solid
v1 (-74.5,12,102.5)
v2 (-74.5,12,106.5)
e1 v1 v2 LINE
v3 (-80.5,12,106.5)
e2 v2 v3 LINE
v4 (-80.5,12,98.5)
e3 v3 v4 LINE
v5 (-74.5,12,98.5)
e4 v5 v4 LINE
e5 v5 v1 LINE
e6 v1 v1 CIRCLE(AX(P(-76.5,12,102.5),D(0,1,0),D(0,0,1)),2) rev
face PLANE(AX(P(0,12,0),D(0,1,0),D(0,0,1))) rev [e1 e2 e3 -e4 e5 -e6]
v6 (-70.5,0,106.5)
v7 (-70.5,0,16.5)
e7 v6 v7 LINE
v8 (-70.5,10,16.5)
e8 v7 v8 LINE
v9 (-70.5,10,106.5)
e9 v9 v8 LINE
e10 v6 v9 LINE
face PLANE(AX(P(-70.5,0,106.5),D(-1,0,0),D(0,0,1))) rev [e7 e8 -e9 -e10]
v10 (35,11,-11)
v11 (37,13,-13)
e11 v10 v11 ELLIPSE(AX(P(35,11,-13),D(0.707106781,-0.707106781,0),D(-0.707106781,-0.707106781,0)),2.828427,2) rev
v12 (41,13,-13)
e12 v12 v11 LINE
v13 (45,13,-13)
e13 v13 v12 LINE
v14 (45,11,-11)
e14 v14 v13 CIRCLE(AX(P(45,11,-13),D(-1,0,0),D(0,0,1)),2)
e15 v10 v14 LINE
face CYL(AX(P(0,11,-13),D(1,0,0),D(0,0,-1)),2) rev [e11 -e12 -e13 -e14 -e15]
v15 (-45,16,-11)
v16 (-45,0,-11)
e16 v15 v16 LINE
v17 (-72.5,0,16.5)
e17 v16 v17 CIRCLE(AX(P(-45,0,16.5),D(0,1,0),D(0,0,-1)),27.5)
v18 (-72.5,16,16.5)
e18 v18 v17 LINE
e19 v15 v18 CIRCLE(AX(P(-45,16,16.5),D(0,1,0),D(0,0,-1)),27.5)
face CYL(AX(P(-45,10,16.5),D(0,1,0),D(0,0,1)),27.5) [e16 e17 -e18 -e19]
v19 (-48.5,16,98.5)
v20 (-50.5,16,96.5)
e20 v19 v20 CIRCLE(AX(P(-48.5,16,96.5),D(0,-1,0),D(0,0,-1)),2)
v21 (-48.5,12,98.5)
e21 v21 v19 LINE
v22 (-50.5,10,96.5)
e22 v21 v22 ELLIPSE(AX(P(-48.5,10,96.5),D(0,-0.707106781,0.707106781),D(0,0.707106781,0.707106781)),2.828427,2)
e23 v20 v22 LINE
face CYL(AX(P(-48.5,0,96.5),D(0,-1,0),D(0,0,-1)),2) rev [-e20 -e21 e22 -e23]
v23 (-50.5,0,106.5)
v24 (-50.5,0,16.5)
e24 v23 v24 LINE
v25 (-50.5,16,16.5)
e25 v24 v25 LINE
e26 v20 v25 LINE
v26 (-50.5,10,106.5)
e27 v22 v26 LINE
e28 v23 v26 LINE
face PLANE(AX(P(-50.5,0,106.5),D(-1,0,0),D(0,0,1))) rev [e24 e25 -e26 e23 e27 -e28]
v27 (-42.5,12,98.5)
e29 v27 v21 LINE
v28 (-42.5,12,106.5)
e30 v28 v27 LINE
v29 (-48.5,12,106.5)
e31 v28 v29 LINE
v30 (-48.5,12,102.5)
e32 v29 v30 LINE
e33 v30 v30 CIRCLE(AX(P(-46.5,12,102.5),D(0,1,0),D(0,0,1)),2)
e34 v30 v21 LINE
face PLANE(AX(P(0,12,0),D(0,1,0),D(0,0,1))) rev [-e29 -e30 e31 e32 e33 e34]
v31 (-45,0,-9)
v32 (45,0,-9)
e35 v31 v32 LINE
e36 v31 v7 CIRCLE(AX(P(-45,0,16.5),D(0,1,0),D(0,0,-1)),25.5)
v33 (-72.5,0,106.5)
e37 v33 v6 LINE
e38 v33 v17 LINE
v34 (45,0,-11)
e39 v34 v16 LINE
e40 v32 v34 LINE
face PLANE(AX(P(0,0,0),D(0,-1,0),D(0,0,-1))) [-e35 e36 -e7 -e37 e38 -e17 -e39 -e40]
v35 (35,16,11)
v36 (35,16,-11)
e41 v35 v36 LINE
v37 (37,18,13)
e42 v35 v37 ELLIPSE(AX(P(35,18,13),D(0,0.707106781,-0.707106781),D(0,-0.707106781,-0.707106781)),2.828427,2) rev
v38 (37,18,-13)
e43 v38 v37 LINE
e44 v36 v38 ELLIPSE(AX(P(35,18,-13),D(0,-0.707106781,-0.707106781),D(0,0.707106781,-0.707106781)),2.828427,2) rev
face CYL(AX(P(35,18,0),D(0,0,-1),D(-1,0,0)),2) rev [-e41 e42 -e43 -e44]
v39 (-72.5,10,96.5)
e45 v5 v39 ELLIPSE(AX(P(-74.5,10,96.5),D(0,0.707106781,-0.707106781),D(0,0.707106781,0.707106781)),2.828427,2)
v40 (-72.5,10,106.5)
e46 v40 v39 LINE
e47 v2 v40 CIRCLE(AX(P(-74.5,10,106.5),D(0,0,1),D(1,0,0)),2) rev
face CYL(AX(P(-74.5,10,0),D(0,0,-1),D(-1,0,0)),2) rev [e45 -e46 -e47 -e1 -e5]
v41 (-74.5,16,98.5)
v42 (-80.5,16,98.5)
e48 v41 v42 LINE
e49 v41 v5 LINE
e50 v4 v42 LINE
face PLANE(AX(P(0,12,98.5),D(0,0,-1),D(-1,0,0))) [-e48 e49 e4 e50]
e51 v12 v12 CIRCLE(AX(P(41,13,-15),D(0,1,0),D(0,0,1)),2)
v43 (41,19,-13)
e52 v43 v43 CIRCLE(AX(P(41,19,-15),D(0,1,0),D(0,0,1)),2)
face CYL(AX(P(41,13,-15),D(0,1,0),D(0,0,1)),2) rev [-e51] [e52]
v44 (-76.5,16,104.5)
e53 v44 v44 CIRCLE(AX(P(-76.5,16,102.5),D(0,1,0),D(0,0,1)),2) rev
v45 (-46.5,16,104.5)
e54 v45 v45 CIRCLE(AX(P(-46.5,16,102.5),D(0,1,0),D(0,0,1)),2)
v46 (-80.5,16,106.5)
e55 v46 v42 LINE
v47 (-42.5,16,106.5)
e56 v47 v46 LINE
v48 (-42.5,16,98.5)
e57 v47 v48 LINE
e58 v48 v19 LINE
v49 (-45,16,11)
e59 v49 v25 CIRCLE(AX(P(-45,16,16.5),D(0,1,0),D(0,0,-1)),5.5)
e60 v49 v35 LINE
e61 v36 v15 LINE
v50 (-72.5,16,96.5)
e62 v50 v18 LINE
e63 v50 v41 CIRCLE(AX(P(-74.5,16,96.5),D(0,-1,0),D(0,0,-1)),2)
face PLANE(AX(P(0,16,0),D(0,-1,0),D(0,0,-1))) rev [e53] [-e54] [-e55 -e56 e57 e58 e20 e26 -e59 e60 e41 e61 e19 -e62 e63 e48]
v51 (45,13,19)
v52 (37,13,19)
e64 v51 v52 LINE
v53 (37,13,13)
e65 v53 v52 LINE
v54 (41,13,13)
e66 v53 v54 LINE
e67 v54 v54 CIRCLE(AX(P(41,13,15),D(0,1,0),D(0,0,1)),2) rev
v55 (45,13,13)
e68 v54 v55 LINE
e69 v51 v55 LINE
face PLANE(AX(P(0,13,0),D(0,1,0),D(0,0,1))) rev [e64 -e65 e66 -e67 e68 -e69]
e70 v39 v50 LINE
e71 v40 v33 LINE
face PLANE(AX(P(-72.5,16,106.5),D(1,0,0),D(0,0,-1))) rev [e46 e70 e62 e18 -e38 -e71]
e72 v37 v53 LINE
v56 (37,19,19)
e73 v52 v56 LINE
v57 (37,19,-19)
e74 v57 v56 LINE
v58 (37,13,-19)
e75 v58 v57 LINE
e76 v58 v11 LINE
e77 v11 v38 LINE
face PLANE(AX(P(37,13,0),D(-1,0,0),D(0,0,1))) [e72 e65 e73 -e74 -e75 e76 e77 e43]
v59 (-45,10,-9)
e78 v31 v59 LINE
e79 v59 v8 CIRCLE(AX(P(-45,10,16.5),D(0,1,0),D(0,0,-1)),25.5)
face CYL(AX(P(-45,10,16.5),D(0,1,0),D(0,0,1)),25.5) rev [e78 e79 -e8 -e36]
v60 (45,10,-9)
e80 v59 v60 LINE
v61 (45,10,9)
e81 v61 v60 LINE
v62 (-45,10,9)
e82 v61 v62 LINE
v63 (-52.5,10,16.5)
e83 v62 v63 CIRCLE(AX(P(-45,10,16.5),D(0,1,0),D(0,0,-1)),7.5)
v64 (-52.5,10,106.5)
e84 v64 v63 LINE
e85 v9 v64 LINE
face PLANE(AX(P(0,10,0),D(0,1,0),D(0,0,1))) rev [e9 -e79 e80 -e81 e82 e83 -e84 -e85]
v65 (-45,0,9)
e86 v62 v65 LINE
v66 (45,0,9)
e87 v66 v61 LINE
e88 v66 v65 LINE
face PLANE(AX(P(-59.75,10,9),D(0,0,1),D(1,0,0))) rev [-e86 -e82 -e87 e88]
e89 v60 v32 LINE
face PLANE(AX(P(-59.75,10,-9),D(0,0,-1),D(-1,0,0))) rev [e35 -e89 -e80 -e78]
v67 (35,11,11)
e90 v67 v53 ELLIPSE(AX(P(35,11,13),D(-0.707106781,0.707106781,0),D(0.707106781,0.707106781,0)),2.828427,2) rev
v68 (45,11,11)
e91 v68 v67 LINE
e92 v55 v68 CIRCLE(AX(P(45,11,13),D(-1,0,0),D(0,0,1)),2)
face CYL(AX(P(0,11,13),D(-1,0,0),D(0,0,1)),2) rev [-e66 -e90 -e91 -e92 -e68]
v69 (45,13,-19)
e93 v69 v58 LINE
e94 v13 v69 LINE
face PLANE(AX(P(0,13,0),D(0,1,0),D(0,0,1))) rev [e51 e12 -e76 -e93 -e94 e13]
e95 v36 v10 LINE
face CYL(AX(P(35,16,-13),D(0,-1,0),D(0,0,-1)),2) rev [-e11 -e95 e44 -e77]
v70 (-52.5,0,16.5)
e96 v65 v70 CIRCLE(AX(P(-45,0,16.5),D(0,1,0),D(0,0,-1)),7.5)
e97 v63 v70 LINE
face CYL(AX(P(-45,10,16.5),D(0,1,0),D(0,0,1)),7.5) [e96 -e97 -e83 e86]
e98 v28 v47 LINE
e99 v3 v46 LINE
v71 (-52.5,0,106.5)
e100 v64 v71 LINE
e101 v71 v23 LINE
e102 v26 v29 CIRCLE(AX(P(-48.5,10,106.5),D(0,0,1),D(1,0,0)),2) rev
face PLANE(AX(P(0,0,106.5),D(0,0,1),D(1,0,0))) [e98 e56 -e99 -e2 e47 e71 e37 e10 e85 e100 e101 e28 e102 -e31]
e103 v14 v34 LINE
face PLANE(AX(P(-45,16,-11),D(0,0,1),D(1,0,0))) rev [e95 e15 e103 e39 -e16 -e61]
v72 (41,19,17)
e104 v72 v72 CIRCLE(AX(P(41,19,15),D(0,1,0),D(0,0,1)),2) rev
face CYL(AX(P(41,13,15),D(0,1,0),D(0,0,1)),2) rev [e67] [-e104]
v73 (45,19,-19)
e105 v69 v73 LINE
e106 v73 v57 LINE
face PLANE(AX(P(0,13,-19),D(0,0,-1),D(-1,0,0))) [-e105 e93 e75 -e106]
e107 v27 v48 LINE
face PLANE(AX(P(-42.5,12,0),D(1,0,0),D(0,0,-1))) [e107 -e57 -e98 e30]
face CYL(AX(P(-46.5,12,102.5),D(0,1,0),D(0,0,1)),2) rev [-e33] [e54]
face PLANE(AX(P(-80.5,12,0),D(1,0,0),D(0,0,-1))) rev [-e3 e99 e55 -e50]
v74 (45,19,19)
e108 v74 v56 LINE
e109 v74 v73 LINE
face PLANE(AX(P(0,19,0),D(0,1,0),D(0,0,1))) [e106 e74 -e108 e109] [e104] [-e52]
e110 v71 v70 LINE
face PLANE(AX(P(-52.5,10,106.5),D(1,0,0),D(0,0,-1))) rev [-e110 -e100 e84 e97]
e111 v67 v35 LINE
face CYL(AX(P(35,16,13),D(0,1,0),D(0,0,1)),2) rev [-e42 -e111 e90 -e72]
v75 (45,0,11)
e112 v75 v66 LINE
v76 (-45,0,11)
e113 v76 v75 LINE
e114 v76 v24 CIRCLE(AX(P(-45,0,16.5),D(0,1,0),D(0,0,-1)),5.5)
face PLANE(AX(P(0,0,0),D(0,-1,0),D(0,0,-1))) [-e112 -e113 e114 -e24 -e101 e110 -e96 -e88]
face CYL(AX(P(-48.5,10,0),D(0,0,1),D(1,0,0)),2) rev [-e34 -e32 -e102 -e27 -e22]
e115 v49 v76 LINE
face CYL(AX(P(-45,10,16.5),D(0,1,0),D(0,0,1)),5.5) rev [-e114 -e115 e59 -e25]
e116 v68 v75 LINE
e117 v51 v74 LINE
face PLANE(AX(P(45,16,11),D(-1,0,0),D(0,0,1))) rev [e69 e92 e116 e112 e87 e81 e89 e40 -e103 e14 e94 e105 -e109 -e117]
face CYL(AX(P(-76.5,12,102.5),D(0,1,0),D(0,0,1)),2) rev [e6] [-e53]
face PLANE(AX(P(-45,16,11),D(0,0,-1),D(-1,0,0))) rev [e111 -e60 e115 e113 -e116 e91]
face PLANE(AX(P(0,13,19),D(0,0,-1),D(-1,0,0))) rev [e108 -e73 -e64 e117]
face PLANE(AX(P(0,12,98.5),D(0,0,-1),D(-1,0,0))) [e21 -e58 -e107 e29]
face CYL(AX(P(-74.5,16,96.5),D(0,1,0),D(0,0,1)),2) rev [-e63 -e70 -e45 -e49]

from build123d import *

# Parameters (mm, degrees)
SKETCH1_W           = 90
SKETCH1_H           = 22
BOSS_EXTRUDE1_DEPTH = 16
SKETCH2_W           = 119.5
SKETCH2_H           = 18
CUT_EXTRUDE1_DEPTH  = 10
SWEEP5_START        = 10
SWEEP5_DEPTH        = 6
SWEEP5_2_DEPTH      = 10
BOSS_EXTRUDE2_DEPTH = 90
SKETCH12_W          = 8
SKETCH12_H          = 11
SKETCH12_H_2        = 8
SKETCH12_R          = 2
BOSS_EXTRUDE3_DEPTH = 3
SKETCH14_W          = 8
SKETCH14_H          = 8
SKETCH14_R          = 2
SKETCH14_W_2        = 11
BOSS_EXTRUDE4_DEPTH = 4
FILLET1_R           = 2


# Read off the part's stored shape, not the designer's step: Sweep5
with BuildPart() as part:
    # Sketch1 → Boss-Extrude1 (new body)
    with BuildSketch(Plane(origin=(0, 0, 0), x_dir=(1, 0, 0), z_dir=(0, 1, 0))):
        Rectangle(SKETCH1_W, SKETCH1_H)
    extrude(amount=BOSS_EXTRUDE1_DEPTH)

    # Sketch2 → Cut-Extrude1 (cut)
    with BuildSketch(Plane.XZ):
        Rectangle(SKETCH2_W, SKETCH2_H)
    extrude(amount=-CUT_EXTRUDE1_DEPTH, mode=Mode.SUBTRACT)

    # Sweep5 outline → Sweep5 (add)
    with BuildSketch(Plane(origin=(0, 0, 0), x_dir=(1, 0, 0), z_dir=(0, 1, 0)).offset(SWEEP5_START)):
        with BuildLine():
            ThreePointArc((-45, 11), (-64.445436483, 2.945436483), (-72.5, -16.5))
            Line((-72.5, -16.5), (-50.5, -16.5))
            ThreePointArc((-50.5, -16.5), (-48.889087297, -12.610912703), (-45, -11))
            Line((-45, -11), (-45, 11))
        make_face()
    extrude(amount=SWEEP5_DEPTH)

    # Sweep5 2 outline → Sweep5 2 (add)
    with BuildSketch(Plane(origin=(0, 0, 0), x_dir=(1, 0, 0), z_dir=(0, 1, 0))):
        with BuildLine():
            ThreePointArc((-45, 11), (-64.445436483, 2.945436483), (-72.5, -16.5))
            Line((-72.5, -16.5), (-70.5, -16.5))
            ThreePointArc((-70.5, -16.5), (-63.03122292, 1.53122292), (-45, 9))
            Line((-45, 9), (-45, 11))
        make_face()
        with BuildLine():
            ThreePointArc((-45, -9), (-50.303300859, -11.196699141), (-52.5, -16.5))
            Line((-52.5, -16.5), (-50.5, -16.5))
            ThreePointArc((-50.5, -16.5), (-48.889087297, -12.610912703), (-45, -11))
            Line((-45, -11), (-45, -9))
        make_face()
    extrude(amount=SWEEP5_2_DEPTH)

    # Sketch11 → Boss-Extrude2 (add)
    with BuildSketch(Plane.XY.offset(16.5)):
        Polygon((-72.5, 16), (-72.5, 0), (-70.5, 0), (-70.5, 10), (-52.5, 10), (-52.5, 0), (-50.5, 0), (-50.5, 16), align=None)
    extrude(amount=BOSS_EXTRUDE2_DEPTH)

    # Sketch12 → Boss-Extrude3 (add, symmetric)
    # profile 1 of 4: a face of its own
    with BuildSketch(Plane(origin=(0, 16, 0), x_dir=(1, 0, 0), z_dir=(0, 1, 0))):
        with Locations((41, 5.5)):
            Rectangle(SKETCH12_W, SKETCH12_H)
    # profile 2 of 4: a face of its own
    with BuildSketch(Plane(origin=(0, 16, 0), x_dir=(1, 0, 0), z_dir=(0, 1, 0))):
        with Locations((41, -5.5)):
            Rectangle(SKETCH12_W, SKETCH12_H)
    # profile 3 of 4: a face of its own
    with BuildSketch(Plane(origin=(0, 16, 0), x_dir=(1, 0, 0), z_dir=(0, 1, 0))):
        with Locations((41, -15)):
            Rectangle(SKETCH12_W, SKETCH12_H_2)
        with Locations(Location((41, -15, 0), (0, 0, 270))):
            Circle(SKETCH12_R, mode=Mode.SUBTRACT)
    # profile 4 of 4: a face of its own
    with BuildSketch(Plane(origin=(0, 16, 0), x_dir=(1, 0, 0), z_dir=(0, 1, 0))):
        with Locations((41, 15)):
            Rectangle(SKETCH12_W, SKETCH12_H_2)
        with Locations(Location((41, 15, 0), (0, 0, 270))):
            Circle(SKETCH12_R, mode=Mode.SUBTRACT)
    extrude(amount=BOSS_EXTRUDE3_DEPTH, both=True)

    # Sketch14 → Boss-Extrude4 (add)
    # profile 1 of 4: a face of its own
    with BuildSketch(Plane(origin=(0, 16, 0), x_dir=(1, 0, 0), z_dir=(0, 1, 0))):
        with Locations((-76.5, -102.5)):
            Rectangle(SKETCH14_W, SKETCH14_H)
        with Locations(Location((-76.5, -102.5, 0), (0, 0, 270))):
            Circle(SKETCH14_R, mode=Mode.SUBTRACT)
    # profile 2 of 4: a face of its own
    with BuildSketch(Plane(origin=(0, 16, 0), x_dir=(1, 0, 0), z_dir=(0, 1, 0))):
        with Locations((-67, -102.5)):
            Rectangle(SKETCH14_W_2, SKETCH14_H)
    # profile 3 of 4: a face of its own
    with BuildSketch(Plane(origin=(0, 16, 0), x_dir=(1, 0, 0), z_dir=(0, 1, 0))):
        with Locations((-56, -102.5)):
            Rectangle(SKETCH14_W_2, SKETCH14_H)
    # profile 4 of 4: a face of its own
    with BuildSketch(Plane(origin=(0, 16, 0), x_dir=(1, 0, 0), z_dir=(0, 1, 0))):
        with Locations((-46.5, -102.5)):
            Rectangle(SKETCH14_W, SKETCH14_H)
        with Locations(Location((-46.5, -102.5, 0), (0, 0, 270))):
            Circle(SKETCH14_R, mode=Mode.SUBTRACT)
    extrude(amount=-BOSS_EXTRUDE4_DEPTH)

    # Fillet1
    fillet1_edges = [part.edges().sort_by_distance(p)[0] for p in [
        (-50.5, 14, 98.5),
        (-72.5, 12, 102.5),
        (-50.5, 12, 102.5),
        (-72.5, 14, 98.5),
        (37, 16, 0),
        (41, 13, 11),
        (41, 13, -11),
        (37, 14.5, -11),
        (37, 14.5, 11),
    ]]
    fillet(fillet1_edges, radius=FILLET1_R - 0.0001)  # a hair under: the kernel refuses the full size


solid = part.part
